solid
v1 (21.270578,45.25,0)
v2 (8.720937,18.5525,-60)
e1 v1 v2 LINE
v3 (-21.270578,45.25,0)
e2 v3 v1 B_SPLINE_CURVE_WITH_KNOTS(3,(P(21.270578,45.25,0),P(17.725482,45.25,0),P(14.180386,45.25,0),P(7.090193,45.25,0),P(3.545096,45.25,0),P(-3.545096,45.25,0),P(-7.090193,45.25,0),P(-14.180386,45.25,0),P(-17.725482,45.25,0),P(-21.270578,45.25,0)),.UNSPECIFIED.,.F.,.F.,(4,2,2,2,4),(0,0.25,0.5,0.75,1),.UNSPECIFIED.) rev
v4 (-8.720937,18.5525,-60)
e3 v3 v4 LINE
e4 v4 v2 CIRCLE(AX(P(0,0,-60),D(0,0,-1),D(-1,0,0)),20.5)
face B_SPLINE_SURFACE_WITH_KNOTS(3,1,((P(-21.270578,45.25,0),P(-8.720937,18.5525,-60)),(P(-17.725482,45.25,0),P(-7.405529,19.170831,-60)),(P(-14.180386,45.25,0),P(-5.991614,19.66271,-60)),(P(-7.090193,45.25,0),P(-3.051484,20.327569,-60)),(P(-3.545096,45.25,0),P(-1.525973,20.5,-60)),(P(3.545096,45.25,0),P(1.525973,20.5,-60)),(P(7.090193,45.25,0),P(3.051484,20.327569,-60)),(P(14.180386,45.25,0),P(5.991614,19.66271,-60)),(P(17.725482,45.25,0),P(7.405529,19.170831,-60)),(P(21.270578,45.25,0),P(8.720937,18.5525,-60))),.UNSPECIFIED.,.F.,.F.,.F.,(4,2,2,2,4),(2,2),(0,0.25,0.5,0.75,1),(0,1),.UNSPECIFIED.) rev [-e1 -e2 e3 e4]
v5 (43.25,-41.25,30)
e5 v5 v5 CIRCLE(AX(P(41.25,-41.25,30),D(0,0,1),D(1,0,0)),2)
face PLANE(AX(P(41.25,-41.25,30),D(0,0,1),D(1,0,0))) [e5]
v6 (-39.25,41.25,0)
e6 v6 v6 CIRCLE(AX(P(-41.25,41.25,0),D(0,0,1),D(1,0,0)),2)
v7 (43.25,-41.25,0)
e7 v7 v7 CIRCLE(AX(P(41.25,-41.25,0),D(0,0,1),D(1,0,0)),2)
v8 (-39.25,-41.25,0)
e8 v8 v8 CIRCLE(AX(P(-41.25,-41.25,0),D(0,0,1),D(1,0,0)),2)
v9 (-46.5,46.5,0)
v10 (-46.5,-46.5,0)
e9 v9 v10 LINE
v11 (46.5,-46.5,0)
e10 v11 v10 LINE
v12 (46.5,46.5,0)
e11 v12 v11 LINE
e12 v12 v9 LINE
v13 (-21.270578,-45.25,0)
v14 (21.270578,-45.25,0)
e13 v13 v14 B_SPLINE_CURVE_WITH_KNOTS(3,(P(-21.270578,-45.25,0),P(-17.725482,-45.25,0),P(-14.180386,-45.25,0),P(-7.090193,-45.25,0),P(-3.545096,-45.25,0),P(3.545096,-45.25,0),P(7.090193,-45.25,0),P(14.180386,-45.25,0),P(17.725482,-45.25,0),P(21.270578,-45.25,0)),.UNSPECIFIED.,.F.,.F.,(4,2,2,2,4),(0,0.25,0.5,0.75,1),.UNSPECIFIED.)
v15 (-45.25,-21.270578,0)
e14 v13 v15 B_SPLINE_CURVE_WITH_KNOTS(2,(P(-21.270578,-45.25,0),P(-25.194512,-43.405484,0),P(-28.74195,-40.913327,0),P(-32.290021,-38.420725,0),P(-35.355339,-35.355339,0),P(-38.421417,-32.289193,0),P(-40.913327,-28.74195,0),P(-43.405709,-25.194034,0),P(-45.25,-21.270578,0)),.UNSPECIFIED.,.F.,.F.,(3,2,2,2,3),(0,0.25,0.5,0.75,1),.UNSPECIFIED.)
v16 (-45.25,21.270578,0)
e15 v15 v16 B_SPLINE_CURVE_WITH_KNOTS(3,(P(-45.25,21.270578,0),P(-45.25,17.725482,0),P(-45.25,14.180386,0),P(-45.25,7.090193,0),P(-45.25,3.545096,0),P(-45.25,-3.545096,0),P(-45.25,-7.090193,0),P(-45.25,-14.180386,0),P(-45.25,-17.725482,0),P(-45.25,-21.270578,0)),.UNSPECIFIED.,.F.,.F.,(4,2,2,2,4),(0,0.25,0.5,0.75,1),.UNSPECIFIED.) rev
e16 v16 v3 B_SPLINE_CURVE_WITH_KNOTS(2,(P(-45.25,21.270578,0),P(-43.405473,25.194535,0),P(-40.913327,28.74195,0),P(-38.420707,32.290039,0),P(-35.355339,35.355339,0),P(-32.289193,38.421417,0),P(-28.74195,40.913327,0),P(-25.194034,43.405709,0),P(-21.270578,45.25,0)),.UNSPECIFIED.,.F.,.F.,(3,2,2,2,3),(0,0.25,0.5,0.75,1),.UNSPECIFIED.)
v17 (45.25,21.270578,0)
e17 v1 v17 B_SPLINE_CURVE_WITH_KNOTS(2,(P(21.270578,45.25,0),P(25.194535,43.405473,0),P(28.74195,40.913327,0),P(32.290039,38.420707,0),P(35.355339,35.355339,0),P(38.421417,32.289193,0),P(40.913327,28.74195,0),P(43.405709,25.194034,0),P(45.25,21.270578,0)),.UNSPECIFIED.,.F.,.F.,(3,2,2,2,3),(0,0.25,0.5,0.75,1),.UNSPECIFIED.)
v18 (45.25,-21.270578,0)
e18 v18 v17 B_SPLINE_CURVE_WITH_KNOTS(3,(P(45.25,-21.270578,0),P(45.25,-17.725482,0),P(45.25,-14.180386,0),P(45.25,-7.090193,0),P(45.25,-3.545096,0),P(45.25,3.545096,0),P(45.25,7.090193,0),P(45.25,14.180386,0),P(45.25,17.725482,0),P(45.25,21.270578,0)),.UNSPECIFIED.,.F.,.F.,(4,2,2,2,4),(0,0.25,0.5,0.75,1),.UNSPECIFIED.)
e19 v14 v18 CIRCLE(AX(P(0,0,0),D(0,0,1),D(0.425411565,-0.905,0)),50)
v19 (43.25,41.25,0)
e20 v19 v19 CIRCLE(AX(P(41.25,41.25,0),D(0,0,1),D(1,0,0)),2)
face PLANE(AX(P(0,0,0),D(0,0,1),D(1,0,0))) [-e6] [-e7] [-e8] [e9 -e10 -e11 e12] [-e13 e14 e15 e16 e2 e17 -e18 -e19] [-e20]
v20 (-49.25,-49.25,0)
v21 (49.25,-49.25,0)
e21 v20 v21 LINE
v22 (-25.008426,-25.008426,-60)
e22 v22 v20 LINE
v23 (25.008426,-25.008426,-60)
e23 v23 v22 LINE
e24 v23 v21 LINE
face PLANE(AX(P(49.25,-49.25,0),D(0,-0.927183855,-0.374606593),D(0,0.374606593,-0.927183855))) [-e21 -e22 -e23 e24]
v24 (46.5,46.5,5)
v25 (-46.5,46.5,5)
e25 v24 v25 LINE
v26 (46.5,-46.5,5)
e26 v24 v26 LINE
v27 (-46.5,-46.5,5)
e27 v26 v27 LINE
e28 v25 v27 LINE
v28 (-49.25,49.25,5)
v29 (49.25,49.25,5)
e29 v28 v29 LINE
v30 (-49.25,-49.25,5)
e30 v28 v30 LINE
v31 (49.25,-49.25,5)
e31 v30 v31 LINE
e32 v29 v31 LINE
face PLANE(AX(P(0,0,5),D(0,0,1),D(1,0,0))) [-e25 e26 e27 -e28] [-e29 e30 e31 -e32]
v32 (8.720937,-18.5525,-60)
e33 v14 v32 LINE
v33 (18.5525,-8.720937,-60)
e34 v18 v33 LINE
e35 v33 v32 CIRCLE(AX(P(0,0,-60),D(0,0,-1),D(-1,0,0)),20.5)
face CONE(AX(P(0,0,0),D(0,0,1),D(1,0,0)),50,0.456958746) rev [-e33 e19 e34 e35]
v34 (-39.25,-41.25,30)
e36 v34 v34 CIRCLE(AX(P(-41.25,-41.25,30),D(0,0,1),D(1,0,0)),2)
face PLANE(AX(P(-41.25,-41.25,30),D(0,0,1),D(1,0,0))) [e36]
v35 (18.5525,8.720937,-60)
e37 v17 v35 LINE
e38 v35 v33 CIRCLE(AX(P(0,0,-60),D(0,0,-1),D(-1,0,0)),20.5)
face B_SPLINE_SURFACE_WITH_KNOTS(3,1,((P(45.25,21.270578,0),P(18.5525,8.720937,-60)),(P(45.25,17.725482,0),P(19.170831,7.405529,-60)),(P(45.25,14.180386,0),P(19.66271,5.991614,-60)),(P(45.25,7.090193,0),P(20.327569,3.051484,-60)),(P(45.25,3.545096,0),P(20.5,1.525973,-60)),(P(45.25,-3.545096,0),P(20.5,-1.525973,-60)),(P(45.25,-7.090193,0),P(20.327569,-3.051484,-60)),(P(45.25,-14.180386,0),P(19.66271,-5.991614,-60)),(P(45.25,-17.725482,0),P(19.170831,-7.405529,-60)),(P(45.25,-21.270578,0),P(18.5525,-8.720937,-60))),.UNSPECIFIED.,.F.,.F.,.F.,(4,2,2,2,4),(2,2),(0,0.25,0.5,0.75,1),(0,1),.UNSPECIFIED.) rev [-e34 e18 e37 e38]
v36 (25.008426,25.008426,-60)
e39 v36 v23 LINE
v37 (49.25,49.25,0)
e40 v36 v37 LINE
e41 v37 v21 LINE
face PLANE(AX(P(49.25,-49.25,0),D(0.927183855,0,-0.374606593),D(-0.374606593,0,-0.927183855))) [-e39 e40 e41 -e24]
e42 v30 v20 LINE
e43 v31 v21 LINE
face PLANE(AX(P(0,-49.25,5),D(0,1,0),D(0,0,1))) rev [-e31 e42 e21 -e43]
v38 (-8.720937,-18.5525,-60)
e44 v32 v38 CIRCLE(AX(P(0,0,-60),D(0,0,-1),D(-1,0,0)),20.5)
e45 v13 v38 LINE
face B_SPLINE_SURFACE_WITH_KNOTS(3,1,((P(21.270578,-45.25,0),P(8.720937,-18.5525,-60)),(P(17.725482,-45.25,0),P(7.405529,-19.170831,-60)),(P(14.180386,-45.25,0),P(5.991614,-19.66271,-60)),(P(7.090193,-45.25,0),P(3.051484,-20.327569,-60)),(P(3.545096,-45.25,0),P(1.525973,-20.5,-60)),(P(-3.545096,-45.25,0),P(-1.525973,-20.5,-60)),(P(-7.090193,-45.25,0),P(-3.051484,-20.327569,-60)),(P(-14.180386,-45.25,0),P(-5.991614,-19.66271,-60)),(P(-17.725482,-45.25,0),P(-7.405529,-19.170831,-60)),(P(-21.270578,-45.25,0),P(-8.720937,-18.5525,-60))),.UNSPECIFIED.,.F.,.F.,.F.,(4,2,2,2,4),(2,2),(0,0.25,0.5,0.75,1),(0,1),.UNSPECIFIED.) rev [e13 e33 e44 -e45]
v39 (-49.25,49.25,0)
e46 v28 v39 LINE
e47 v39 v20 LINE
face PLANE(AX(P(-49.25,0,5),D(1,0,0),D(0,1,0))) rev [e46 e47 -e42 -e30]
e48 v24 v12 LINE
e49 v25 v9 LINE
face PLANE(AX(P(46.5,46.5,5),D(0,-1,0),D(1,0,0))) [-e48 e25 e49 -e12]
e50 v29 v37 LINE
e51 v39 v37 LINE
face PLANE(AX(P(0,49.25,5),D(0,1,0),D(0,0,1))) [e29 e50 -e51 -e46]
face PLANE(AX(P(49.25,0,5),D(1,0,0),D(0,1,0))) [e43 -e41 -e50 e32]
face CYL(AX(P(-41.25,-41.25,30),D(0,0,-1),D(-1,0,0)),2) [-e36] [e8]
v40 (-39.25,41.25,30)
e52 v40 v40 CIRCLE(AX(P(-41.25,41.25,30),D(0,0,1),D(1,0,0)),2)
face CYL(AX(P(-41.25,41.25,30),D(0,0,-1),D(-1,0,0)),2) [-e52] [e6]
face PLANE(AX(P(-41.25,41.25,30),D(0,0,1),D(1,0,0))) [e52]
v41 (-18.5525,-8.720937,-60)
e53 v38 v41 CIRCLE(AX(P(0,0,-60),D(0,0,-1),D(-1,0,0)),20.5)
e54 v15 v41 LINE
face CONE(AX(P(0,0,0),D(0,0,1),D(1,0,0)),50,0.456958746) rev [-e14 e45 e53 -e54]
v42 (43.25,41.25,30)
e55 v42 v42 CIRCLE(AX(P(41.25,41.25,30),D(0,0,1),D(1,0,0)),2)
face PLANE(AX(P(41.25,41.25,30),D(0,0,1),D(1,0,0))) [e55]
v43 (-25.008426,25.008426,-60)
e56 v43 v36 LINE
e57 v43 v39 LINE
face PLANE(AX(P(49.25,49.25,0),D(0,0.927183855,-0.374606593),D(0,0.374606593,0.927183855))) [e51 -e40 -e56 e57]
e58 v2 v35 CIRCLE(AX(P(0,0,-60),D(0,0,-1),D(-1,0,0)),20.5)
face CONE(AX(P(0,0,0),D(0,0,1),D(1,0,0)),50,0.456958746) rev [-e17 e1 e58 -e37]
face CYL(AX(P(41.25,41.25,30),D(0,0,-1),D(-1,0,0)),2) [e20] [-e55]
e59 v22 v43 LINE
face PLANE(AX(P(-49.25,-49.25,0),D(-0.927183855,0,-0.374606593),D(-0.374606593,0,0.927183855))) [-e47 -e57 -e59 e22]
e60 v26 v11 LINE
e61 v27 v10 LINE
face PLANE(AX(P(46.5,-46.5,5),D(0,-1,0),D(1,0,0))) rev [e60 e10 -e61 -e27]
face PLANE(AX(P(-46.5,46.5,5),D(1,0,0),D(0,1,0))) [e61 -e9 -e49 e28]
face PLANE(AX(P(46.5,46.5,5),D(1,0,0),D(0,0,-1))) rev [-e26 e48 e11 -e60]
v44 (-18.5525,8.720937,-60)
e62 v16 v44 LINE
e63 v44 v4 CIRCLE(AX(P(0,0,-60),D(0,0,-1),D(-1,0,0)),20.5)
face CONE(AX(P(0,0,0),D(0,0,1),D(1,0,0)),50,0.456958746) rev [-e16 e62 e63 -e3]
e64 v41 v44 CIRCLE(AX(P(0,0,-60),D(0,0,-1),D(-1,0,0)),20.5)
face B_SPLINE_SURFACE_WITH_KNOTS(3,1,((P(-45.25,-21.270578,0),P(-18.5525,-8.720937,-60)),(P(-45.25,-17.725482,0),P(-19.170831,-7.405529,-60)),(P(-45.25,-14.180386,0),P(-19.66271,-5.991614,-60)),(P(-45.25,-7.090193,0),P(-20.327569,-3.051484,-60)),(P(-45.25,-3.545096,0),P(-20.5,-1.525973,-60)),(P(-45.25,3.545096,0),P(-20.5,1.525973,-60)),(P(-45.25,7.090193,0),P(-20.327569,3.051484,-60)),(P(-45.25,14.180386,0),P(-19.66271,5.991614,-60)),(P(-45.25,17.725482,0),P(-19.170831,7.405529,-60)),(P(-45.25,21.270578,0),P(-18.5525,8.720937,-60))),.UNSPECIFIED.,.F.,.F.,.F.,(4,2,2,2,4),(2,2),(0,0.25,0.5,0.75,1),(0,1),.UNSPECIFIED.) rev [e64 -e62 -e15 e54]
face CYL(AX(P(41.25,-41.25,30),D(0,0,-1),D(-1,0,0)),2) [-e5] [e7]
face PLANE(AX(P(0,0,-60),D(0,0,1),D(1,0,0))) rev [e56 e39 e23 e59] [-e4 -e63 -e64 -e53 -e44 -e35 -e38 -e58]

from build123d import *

# Parameters (mm, degrees)
SKIZZE1_W                       = 98.5
SKIZZE1_H                       = 98.5
SKIZZE1_W_2                     = 90.5
SKIZZE1_H_2                     = 90.5
AUFSATZ_LINEAR_AUSTRAGEN2_DEPTH = 5
SKIZZE6_W                       = 98.5
SKIZZE6_H                       = 98.5
AUFSATZ_LINEAR_AUSTRAGEN4_DEPTH = 60
AUFSATZ_LINEAR_AUSTRAGEN4_TAPER = 22
SKIZZE7_W                       = 93
SKIZZE7_H                       = 93
SCHNITT_LINEAR_AUSTRAGEN1_DEPTH = 5
SKIZZE10_R                      = 2
AUFSATZ_LINEAR_AUSTRAGEN5_DEPTH = 30


with BuildPart() as part:
    # Skizze1 → Aufsatz-Linear austragen2 (new body)
    # profile 1 of 5: a face of its own
    with BuildSketch(Plane.XY):
        Rectangle(SKIZZE1_W, SKIZZE1_H)
        Rectangle(SKIZZE1_W_2, SKIZZE1_H_2, mode=Mode.SUBTRACT)
    # profile 2 of 5: a face of its own
    with BuildSketch(Plane.XY):
        with BuildLine():
            Line((-45.25, 45.25), (-45.25, 21.270578271))
            ThreePointArc((-45.25, 21.270578271), (-35.355339059, 35.355339059), (-21.270578271, 45.25))
            Line((-21.270578271, 45.25), (-45.25, 45.25))
        make_face()
    # profile 3 of 5: a face of its own
    with BuildSketch(Plane.XY):
        with BuildLine():
            ThreePointArc((21.270578271, 45.25), (35.355339059, 35.355339059), (45.25, 21.270578271))
            Line((45.25, 21.270578271), (45.25, 45.25))
            Line((45.25, 45.25), (21.270578271, 45.25))
        make_face()
    # profile 4 of 5: a face of its own
    with BuildSketch(Plane.XY):
        with BuildLine():
            ThreePointArc((45.25, -21.270578271), (35.355339059, -35.355339059), (21.270578271, -45.25))
            Line((21.270578271, -45.25), (45.25, -45.25))
            Line((45.25, -45.25), (45.25, -21.270578271))
        make_face()
    # profile 5 of 5: a face of its own
    with BuildSketch(Plane.XY):
        with BuildLine():
            Line((-45.25, -21.270578271), (-45.25, -45.25))
            Line((-45.25, -45.25), (-21.270578271, -45.25))
            ThreePointArc((-21.270578271, -45.25), (-35.355339059, -35.355339059), (-45.25, -21.270578271))
        make_face()
    extrude(amount=AUFSATZ_LINEAR_AUSTRAGEN2_DEPTH)

    # Skizze6 → Aufsatz-Linear austragen4 (add)
    with BuildSketch(Plane(origin=(0, 0, 0), x_dir=(-1, 0, 0), z_dir=(0, 0, -1))):
        Rectangle(SKIZZE6_W, SKIZZE6_H)
    extrude(amount=AUFSATZ_LINEAR_AUSTRAGEN4_DEPTH, taper=AUFSATZ_LINEAR_AUSTRAGEN4_TAPER)

    # Schnitt-Ausformung4: read off the stored shape, not the designer's step
    # Schnitt-Ausformung4: loft between two sections, ruled curve by curve
    schnitt_ausformung4_from = [
        Edge.make_bspline([(45.25, 21.270578271, 0), (45.25, 17.725481893, 0), (45.25, 14.180385514, 0), (45.25, 7.090192757, 0), (45.25, 3.545096379, 0), (45.25, -3.545096379, 0), (45.25, -7.090192757, 0), (45.25, -14.180385514, 0), (45.25, -17.725481893, 0), (45.25, -21.270578271, 0)], [0, 0, 0, 0, 0.25, 0.25, 0.5, 0.5, 0.75, 0.75, 1, 1, 1, 1], 3),
        Edge.make_bspline([(21.270578271, -45.25, 0), (17.725481893, -45.25, 0), (14.180385514, -45.25, 0), (7.090192757, -45.25, 0), (3.545096379, -45.25, 0), (-3.545096379, -45.25, 0), (-7.090192757, -45.25, 0), (-14.180385514, -45.25, 0), (-17.725481893, -45.25, 0), (-21.270578271, -45.25, 0)], [0, 0, 0, 0, 0.25, 0.25, 0.5, 0.5, 0.75, 0.75, 1, 1, 1, 1], 3),
        Edge.make_bspline([(-45.25, -21.270578271, 0), (-45.25, -17.725481893, 0), (-45.25, -14.180385514, 0), (-45.25, -7.090192757, 0), (-45.25, -3.545096379, 0), (-45.25, 3.545096379, 0), (-45.25, 7.090192757, 0), (-45.25, 14.180385514, 0), (-45.25, 17.725481893, 0), (-45.25, 21.270578271, 0)], [0, 0, 0, 0, 0.25, 0.25, 0.5, 0.5, 0.75, 0.75, 1, 1, 1, 1], 3),
        Edge.make_bspline([(-21.270578271, 45.25, 0), (-17.725481893, 45.25, 0), (-14.180385514, 45.25, 0), (-7.090192757, 45.25, 0), (-3.545096379, 45.25, 0), (3.545096379, 45.25, 0), (7.090192757, 45.25, 0), (14.180385514, 45.25, 0), (17.725481893, 45.25, 0), (21.270578271, 45.25, 0)], [0, 0, 0, 0, 0.25, 0.25, 0.5, 0.5, 0.75, 0.75, 1, 1, 1, 1], 3),
        Edge.make_three_point_arc((21.270578271, -45.25, 0), (35.355339059, -35.355339059, 0), (45.25, -21.270578271, 0)),
        Edge.make_three_point_arc((-45.25, -21.270578271, 0), (-35.355339059, -35.355339059, 0), (-21.270578271, -45.25, 0)),
        Edge.make_three_point_arc((-21.270578271, 45.25, 0), (-35.355339059, 35.355339059, 0), (-45.25, 21.270578271, 0)),
        Edge.make_three_point_arc((45.25, 21.270578271, 0), (35.355339059, 35.355339059, 0), (21.270578271, 45.25, 0)),
    ]
    schnitt_ausformung4_to = [
        Edge.make_bspline([(18.5525, 8.720937091, -60), (19.17083125, 7.40552908, -60), (19.662710025, 5.991613705, -60), (20.327568653, 3.051483732, -60), (20.5, 1.525973244, -60), (20.5, -1.525973244, -60), (20.327568653, -3.051483732, -60), (19.662710025, -5.991613705, -60), (19.17083125, -7.40552908, -60), (18.5525, -8.720937091, -60)], [0, 0, 0, 0, 0.25, 0.25, 0.5, 0.5, 0.75, 0.75, 1, 1, 1, 1], 3),
        Edge.make_bspline([(8.720937091, -18.5525, -60), (7.40552908, -19.17083125, -60), (5.991613705, -19.662710025, -60), (3.051483732, -20.327568653, -60), (1.525973244, -20.5, -60), (-1.525973244, -20.5, -60), (-3.051483732, -20.327568653, -60), (-5.991613705, -19.662710025, -60), (-7.40552908, -19.17083125, -60), (-8.720937091, -18.5525, -60)], [0, 0, 0, 0, 0.25, 0.25, 0.5, 0.5, 0.75, 0.75, 1, 1, 1, 1], 3),
        Edge.make_bspline([(-18.5525, -8.720937091, -60), (-19.17083125, -7.40552908, -60), (-19.662710025, -5.991613705, -60), (-20.327568653, -3.051483732, -60), (-20.5, -1.525973244, -60), (-20.5, 1.525973244, -60), (-20.327568653, 3.051483732, -60), (-19.662710025, 5.991613705, -60), (-19.17083125, 7.40552908, -60), (-18.5525, 8.720937091, -60)], [0, 0, 0, 0, 0.25, 0.25, 0.5, 0.5, 0.75, 0.75, 1, 1, 1, 1], 3),
        Edge.make_bspline([(-8.720937091, 18.5525, -60), (-7.40552908, 19.17083125, -60), (-5.991613705, 19.662710025, -60), (-3.051483732, 20.327568653, -60), (-1.525973244, 20.5, -60), (1.525973244, 20.5, -60), (3.051483732, 20.327568653, -60), (5.991613705, 19.662710025, -60), (7.40552908, 19.17083125, -60), (8.720937091, 18.5525, -60)], [0, 0, 0, 0, 0.25, 0.25, 0.5, 0.5, 0.75, 0.75, 1, 1, 1, 1], 3),
        Edge.make_three_point_arc((8.720937091, -18.5525, -60), (14.495689014, -14.495689014, -60), (18.5525, -8.720937091, -60)),
        Edge.make_three_point_arc((-18.5525, -8.720937091, -60), (-14.495689014, -14.495689014, -60), (-8.720937091, -18.5525, -60)),
        Edge.make_three_point_arc((-8.720937091, 18.5525, -60), (-14.495689014, 14.495689014, -60), (-18.5525, 8.720937091, -60)),
        Edge.make_three_point_arc((18.5525, 8.720937091, -60), (14.495689014, 14.495689014, -60), (8.720937091, 18.5525, -60)),
    ]
    schnitt_ausformung4 = Solid(Shell([*[Face.make_surface_from_curves(schnitt_ausformung4_from[k], schnitt_ausformung4_to[k]) for k in range(8)], Face(Wire(schnitt_ausformung4_from)), Face(Wire(schnitt_ausformung4_to))]))
    add(schnitt_ausformung4, mode=Mode.SUBTRACT)

    # Skizze7 → Schnitt-Linear austragen1 (cut)
    with BuildSketch(Plane.XY):
        Rectangle(SKIZZE7_W, SKIZZE7_H)
    extrude(amount=SCHNITT_LINEAR_AUSTRAGEN1_DEPTH, mode=Mode.SUBTRACT)

    # Skizze10 → Aufsatz-Linear austragen5 (add)
    with BuildSketch(Plane.XY):
        with Locations((41.25, 41.25)):
            Circle(SKIZZE10_R)
        with Locations((41.25, -41.25)):
            Circle(SKIZZE10_R)
        with Locations((-41.25, -41.25)):
            Circle(SKIZZE10_R)
        with Locations((-41.25, 41.25)):
            Circle(SKIZZE10_R)
    extrude(amount=AUFSATZ_LINEAR_AUSTRAGEN5_DEPTH)


solid = part.part
